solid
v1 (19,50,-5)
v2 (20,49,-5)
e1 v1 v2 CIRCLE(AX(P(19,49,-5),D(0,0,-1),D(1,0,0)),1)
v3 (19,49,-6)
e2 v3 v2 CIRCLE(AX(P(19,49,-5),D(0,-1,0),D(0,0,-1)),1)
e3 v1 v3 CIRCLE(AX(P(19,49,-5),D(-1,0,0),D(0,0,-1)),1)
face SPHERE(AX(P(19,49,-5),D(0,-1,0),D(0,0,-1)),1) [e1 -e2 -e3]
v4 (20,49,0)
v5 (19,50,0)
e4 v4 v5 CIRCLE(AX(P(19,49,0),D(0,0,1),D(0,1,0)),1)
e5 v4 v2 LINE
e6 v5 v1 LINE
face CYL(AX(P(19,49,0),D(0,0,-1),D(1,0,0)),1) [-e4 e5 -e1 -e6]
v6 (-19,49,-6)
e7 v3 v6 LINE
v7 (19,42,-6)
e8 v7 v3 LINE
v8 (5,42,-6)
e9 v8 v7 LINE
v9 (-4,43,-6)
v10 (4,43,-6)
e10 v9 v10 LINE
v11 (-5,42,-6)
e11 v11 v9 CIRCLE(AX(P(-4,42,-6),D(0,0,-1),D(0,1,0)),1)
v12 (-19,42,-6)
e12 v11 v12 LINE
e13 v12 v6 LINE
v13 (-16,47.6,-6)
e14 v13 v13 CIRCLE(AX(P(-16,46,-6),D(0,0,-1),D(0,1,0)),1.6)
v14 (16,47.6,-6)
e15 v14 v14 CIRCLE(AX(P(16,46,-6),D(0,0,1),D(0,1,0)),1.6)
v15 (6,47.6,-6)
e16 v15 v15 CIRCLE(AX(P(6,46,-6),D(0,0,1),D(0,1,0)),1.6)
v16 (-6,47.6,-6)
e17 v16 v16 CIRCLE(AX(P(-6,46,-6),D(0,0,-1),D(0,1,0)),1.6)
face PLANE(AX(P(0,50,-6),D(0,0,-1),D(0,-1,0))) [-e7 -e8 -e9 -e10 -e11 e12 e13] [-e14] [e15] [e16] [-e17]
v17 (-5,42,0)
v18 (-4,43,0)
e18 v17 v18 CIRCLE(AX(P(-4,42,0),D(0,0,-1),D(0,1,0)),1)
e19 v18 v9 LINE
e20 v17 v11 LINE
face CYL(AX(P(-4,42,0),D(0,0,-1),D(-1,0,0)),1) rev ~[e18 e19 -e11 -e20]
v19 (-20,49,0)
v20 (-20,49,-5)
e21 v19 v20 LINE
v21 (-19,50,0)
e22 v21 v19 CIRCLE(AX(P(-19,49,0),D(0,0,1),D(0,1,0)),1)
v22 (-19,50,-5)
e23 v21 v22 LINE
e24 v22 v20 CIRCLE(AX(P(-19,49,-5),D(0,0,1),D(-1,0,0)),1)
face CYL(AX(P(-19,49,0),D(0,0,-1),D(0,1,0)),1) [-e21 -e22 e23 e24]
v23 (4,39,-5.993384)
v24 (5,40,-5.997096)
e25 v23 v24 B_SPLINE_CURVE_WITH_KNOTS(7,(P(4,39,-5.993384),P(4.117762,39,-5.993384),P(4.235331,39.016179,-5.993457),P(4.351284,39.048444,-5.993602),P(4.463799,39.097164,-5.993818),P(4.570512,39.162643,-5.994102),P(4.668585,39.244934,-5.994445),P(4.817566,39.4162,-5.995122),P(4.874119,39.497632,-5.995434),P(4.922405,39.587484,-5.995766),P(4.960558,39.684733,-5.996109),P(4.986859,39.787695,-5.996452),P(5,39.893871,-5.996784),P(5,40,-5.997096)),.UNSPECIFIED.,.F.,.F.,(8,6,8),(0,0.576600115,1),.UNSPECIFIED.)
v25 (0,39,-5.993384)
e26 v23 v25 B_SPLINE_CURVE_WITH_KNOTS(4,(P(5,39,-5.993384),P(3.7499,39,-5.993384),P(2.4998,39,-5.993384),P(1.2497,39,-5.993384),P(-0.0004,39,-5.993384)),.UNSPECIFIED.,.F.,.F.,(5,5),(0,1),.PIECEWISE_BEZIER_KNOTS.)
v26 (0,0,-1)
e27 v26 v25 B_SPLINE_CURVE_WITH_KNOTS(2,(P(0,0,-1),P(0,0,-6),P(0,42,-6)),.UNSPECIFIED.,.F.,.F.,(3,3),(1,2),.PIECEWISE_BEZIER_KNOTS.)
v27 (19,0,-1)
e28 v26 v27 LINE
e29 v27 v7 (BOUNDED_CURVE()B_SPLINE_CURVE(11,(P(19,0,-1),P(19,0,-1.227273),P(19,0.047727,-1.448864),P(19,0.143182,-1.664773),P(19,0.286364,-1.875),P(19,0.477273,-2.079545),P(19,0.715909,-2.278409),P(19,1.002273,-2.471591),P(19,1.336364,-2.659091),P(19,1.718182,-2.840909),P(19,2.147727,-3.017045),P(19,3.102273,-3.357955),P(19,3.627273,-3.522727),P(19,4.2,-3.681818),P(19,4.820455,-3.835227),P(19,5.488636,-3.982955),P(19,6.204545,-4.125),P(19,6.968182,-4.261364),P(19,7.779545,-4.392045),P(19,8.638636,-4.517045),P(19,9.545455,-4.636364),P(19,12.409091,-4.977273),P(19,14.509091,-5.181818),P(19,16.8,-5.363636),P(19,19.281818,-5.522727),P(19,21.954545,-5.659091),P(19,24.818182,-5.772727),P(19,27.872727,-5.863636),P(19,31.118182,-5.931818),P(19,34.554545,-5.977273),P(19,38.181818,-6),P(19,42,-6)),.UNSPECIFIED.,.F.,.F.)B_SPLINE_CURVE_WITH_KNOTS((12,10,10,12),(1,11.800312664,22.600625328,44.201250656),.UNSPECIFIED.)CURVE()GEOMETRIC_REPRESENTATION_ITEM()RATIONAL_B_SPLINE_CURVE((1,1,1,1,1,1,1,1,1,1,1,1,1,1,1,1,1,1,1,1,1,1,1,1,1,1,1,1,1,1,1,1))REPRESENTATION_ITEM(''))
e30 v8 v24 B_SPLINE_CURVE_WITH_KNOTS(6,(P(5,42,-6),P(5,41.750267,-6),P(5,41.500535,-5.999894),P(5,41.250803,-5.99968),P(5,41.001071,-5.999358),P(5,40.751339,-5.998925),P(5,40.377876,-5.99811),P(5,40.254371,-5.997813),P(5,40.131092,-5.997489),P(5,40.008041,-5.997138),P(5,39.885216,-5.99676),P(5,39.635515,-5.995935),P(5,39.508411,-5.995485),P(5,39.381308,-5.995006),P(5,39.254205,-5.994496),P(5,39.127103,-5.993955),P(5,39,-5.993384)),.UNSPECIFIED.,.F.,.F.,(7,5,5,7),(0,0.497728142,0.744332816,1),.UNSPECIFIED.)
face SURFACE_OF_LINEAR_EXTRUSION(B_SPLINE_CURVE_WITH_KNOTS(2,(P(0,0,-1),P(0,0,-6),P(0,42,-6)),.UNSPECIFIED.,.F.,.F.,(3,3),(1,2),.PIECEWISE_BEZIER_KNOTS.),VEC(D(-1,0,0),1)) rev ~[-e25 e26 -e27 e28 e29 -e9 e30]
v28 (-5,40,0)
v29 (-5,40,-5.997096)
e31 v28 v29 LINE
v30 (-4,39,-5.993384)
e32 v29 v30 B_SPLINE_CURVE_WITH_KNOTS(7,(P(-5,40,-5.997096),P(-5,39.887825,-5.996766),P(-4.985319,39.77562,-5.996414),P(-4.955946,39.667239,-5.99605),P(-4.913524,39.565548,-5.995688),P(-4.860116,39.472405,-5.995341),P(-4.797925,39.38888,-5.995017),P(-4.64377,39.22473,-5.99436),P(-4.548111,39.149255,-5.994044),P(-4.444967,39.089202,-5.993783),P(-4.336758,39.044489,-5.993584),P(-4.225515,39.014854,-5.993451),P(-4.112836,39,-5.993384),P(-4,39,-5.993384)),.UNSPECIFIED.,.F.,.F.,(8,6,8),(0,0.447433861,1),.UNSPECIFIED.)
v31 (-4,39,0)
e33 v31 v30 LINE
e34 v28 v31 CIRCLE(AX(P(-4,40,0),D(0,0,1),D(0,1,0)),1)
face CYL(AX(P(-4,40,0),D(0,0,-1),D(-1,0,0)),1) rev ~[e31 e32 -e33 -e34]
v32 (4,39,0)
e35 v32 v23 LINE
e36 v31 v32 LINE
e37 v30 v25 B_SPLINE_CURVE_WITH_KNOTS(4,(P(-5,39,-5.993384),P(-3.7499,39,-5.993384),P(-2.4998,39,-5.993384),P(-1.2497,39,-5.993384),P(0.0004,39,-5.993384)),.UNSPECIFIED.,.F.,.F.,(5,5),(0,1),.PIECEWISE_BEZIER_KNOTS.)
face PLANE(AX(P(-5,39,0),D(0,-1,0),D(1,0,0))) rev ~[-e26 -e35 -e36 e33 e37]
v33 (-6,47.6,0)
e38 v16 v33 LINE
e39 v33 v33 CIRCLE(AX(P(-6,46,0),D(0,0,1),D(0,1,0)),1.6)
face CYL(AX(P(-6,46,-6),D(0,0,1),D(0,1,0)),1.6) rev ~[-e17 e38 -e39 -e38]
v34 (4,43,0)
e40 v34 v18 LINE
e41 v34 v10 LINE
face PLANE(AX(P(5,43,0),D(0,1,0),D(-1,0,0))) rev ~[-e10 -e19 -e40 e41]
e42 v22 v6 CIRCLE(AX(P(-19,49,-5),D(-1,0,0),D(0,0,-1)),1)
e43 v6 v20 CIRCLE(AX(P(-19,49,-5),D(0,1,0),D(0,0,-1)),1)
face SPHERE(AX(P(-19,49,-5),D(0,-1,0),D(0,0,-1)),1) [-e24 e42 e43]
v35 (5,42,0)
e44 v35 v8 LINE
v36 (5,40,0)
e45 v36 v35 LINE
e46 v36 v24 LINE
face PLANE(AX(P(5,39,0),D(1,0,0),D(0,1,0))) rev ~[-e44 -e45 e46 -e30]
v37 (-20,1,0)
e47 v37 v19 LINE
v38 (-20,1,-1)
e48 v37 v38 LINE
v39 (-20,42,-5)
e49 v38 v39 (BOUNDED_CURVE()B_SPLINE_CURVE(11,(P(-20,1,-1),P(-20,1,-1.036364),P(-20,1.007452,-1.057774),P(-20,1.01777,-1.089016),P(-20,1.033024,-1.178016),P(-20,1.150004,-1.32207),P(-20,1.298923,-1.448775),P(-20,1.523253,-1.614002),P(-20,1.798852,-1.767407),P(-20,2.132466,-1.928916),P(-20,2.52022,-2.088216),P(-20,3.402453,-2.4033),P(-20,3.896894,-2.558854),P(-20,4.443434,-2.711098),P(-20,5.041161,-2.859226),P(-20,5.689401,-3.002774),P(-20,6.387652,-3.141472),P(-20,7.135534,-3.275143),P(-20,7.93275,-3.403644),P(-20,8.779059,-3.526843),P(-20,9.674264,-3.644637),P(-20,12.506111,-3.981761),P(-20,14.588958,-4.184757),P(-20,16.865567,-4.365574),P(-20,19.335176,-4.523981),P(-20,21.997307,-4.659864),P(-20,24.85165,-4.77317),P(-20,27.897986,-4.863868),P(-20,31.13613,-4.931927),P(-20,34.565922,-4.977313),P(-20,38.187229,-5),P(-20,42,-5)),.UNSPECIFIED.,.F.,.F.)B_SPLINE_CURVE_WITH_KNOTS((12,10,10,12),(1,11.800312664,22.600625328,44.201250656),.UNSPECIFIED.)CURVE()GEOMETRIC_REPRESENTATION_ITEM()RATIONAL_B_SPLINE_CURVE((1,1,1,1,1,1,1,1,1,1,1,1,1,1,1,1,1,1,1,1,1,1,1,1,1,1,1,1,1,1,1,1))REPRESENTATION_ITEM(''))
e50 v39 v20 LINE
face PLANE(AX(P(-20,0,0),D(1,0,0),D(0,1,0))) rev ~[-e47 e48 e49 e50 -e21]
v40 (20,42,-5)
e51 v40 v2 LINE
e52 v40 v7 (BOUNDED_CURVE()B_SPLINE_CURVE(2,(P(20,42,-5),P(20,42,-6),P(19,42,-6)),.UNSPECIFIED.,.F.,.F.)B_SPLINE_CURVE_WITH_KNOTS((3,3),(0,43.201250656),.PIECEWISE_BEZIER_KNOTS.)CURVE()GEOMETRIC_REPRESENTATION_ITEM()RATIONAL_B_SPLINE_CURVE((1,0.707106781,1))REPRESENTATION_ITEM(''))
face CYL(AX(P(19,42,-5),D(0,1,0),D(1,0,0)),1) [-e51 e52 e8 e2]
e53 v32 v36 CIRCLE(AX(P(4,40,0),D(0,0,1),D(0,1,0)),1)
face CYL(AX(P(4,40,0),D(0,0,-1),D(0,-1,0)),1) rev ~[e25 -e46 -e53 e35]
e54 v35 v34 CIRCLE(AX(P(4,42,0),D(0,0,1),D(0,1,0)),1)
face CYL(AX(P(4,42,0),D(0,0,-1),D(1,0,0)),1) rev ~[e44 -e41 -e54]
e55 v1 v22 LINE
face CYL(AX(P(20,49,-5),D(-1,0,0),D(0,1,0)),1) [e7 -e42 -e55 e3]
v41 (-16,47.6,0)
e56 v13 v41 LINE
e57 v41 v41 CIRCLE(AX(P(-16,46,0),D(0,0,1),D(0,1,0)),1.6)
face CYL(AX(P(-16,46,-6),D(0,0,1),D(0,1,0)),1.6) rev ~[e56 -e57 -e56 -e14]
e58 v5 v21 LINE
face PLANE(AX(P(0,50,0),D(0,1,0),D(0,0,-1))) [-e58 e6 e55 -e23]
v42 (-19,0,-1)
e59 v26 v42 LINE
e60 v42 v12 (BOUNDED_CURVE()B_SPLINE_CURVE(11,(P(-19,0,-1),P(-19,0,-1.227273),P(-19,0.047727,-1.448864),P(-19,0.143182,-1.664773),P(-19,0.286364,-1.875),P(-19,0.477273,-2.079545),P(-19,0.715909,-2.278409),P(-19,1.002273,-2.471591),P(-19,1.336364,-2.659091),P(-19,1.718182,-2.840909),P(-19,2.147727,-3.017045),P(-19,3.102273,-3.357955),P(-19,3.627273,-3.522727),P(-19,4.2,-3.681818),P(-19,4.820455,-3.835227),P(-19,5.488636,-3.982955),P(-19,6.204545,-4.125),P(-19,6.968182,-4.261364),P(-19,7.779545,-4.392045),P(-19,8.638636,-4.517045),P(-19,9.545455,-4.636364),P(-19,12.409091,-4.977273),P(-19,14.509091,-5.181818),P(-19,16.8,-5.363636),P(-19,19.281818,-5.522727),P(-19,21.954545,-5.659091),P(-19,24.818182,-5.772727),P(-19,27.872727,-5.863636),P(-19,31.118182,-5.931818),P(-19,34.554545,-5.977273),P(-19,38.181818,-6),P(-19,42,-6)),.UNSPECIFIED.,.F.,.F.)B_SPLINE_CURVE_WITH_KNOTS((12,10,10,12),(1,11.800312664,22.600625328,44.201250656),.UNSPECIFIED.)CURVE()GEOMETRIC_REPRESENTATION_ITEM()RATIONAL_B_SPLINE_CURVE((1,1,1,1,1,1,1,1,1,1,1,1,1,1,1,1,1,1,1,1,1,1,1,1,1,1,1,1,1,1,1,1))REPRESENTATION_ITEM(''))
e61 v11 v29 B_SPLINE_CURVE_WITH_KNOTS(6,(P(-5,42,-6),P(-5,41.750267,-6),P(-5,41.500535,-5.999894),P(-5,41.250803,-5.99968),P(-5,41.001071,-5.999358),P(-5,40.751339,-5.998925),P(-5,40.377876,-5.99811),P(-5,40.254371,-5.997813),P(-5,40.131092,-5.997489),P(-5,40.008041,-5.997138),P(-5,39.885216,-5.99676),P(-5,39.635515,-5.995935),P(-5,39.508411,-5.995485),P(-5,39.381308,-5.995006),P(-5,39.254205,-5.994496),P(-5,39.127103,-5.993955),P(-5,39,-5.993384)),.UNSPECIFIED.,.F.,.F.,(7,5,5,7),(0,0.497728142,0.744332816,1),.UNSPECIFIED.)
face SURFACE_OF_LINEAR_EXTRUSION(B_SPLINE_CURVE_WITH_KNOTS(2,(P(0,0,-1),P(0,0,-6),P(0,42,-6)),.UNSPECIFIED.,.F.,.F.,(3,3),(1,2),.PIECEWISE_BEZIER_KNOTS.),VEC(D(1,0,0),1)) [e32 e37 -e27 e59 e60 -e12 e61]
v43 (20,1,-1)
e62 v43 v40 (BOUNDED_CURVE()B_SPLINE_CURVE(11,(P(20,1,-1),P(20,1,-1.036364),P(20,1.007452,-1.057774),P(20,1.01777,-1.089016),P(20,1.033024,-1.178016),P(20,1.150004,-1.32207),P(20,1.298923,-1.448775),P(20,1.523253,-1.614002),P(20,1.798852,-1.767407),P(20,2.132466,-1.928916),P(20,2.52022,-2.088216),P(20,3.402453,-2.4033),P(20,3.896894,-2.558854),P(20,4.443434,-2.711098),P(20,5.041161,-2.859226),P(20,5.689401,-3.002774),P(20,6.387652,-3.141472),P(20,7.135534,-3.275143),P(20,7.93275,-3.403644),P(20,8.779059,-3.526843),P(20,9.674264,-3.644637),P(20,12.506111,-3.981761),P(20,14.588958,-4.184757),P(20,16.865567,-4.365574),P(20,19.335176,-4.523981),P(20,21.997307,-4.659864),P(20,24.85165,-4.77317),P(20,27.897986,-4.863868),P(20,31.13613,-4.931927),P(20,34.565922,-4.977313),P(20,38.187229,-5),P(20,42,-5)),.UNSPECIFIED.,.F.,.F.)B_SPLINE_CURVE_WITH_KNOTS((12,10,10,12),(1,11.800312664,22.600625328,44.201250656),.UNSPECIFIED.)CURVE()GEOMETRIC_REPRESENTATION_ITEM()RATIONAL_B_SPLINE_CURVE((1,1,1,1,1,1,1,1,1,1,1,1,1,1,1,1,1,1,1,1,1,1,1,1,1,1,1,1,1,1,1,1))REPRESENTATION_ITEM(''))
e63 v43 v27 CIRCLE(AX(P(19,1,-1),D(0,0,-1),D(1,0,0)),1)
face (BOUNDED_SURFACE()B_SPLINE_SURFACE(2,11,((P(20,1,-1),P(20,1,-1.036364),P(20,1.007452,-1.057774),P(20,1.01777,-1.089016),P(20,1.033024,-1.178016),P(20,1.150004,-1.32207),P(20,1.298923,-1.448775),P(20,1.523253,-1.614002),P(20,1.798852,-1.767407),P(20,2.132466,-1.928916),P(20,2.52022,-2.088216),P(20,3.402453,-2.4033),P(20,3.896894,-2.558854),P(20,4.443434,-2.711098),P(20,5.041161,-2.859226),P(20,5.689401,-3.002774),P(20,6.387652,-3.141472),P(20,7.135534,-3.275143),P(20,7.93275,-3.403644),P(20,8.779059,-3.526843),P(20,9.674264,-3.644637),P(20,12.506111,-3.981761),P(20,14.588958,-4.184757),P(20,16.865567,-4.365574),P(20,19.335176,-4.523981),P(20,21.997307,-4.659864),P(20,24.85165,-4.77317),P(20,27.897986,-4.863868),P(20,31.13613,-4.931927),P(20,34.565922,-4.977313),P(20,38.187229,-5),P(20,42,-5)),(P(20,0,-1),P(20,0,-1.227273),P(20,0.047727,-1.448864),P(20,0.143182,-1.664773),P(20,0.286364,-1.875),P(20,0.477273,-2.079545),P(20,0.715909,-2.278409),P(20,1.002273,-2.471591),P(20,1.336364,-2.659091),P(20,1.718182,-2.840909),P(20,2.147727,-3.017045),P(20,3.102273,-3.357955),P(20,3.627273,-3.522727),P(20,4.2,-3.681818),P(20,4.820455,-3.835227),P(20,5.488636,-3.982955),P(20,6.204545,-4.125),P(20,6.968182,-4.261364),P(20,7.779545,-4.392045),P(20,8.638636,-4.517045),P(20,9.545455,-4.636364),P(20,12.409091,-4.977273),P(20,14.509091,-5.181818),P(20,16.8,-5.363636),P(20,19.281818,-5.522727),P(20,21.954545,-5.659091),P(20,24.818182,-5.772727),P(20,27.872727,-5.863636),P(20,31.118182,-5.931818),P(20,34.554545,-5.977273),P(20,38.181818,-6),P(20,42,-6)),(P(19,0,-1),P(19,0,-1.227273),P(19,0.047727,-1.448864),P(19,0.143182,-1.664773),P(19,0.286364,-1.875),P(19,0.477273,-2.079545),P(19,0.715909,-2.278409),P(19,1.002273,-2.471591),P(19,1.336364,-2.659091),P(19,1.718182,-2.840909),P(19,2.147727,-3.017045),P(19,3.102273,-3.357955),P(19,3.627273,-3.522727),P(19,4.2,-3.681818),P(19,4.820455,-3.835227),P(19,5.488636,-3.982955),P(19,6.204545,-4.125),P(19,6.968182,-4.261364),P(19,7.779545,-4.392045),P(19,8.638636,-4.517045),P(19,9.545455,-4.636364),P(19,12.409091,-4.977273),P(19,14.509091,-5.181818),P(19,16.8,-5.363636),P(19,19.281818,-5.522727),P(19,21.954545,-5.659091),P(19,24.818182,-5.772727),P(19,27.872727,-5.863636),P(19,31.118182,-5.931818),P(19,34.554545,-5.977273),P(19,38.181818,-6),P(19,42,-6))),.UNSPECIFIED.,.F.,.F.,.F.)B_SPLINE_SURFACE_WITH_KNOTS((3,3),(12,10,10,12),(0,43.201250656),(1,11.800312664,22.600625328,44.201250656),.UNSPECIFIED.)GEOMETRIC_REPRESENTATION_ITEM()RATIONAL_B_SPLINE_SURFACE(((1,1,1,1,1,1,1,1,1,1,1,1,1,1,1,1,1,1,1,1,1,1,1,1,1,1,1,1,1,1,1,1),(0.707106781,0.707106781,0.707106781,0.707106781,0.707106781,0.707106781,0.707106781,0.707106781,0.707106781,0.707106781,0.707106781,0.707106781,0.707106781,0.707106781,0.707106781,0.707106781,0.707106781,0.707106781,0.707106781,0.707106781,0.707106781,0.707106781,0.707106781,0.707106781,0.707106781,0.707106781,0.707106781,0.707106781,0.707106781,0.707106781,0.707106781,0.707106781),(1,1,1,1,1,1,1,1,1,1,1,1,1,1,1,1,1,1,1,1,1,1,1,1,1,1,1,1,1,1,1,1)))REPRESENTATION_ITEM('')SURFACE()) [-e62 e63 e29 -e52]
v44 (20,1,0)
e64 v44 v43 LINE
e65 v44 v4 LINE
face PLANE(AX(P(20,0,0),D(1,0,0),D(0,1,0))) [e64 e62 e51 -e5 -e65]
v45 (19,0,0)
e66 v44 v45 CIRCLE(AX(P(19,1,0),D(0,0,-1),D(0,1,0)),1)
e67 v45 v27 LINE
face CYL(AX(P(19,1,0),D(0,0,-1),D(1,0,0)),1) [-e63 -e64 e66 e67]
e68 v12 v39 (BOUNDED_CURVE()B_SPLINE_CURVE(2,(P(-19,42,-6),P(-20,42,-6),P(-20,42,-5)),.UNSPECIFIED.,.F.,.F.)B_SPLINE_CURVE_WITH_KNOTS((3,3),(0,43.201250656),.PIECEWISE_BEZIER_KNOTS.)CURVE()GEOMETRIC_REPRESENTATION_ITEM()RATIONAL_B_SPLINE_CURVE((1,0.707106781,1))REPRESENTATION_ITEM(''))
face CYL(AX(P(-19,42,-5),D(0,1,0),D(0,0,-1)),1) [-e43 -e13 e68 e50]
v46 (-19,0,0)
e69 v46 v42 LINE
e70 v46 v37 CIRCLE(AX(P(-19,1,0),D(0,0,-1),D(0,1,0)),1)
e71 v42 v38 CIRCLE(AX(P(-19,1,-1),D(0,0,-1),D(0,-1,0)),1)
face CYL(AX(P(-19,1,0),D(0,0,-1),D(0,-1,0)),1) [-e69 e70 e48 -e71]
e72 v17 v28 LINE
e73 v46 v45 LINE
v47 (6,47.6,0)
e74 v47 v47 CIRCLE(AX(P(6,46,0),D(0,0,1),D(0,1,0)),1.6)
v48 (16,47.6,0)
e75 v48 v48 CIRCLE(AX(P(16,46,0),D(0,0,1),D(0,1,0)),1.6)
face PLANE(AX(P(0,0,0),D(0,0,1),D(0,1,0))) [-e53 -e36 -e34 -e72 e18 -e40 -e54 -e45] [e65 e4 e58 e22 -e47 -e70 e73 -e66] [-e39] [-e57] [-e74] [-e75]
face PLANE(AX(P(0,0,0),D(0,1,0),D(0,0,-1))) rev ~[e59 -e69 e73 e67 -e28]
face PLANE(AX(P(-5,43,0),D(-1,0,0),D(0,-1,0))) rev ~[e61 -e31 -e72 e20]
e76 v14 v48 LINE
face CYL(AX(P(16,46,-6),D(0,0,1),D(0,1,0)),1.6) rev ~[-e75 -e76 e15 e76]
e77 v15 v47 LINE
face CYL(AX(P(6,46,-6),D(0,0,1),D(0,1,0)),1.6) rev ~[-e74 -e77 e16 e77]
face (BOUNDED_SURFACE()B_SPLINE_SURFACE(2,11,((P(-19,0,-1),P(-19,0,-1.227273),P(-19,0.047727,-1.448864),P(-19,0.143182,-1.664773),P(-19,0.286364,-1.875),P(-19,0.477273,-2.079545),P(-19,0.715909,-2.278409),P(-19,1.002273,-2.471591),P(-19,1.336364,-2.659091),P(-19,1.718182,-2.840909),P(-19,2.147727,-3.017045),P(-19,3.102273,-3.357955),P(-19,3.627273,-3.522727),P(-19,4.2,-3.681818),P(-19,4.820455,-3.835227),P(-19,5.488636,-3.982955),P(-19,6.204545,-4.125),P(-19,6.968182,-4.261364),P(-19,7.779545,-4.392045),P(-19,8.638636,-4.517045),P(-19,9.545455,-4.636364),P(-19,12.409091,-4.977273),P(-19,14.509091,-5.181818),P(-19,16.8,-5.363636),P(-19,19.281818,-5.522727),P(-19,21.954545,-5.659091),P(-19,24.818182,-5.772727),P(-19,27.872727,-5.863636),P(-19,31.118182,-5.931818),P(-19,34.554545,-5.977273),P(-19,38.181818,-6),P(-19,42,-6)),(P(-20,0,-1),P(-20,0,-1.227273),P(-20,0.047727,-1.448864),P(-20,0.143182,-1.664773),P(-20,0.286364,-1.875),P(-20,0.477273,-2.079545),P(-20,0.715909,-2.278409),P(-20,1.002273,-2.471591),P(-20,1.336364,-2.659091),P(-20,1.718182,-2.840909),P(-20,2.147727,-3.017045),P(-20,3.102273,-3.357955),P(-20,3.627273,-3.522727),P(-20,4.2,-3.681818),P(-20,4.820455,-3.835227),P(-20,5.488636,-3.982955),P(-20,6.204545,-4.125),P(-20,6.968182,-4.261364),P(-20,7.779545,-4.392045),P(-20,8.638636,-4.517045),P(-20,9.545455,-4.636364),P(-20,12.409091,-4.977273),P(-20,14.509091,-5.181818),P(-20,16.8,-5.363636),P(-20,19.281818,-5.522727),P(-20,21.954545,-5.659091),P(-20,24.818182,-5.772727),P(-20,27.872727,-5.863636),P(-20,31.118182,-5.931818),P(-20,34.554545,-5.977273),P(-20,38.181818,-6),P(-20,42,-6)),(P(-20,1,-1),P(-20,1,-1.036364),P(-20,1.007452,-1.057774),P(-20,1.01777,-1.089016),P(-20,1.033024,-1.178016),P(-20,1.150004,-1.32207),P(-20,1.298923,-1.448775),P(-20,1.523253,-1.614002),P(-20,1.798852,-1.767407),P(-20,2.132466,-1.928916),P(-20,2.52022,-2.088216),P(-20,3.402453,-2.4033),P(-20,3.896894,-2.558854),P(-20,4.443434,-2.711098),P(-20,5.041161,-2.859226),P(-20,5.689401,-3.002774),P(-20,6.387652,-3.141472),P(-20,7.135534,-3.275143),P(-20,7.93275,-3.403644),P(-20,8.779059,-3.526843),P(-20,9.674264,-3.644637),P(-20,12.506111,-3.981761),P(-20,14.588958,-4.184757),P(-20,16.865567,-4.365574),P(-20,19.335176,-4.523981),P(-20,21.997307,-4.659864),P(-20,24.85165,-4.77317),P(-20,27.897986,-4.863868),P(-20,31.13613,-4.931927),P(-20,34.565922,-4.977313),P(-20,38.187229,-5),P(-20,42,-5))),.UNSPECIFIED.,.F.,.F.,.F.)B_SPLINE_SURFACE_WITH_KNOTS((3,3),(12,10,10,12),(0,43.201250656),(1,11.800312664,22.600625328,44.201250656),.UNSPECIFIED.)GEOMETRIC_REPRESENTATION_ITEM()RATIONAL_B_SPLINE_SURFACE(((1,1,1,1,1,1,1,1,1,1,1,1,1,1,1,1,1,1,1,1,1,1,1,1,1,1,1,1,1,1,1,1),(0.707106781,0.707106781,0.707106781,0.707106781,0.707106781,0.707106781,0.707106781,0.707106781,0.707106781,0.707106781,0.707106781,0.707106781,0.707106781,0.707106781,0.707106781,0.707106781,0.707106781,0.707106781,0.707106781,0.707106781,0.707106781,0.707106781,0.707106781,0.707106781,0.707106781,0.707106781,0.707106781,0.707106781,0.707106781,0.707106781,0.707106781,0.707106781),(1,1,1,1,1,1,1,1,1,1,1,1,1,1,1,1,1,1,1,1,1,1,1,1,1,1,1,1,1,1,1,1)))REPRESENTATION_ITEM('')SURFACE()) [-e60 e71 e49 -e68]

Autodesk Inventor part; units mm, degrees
ref_plane "YZ Plane" through (0, 0, 0) normal (1, 0, 0) x (0, 1, 0)
ref_plane "XZ Plane" through (0, 0, 0) normal (0, 1, 0) x (-1, 0, 0)
ref_plane "XY Plane" through (0, 0, 0) normal (0, 0, 1) x (1, 0, 0)
sketch "スケッチ3" plane through (0, 0, 0) normal (1, 0, 0) x (0, 1, 0)
  line L0 (0, 0) -> (50, 0)
  line L1 (50, 0) -> (50, -6)
  line L2 (50, -6) -> (42, -6)
  line L3 (0, 0) -> (0, -1)
  line L4 (0, -1) -> (0, -6) construction
  line L5 (0, -6) -> (42, -6) construction
  spline S0 degree 2 poles (0, -1) (0, -6) (42, -6) knots 1 1 1 2 2 2
  dimension "d14" = 6
  dimension "d15" = 1
  dimension "d16" = 8
  dimension "d17" = 50
extrude "押し出し2" add sketch "スケッチ3" along normal mid plane 40
sketch "スケッチ4" plane through (20, 50, -6) normal (0, 0, -1) x (-1, 0, 0)
  line L0 (0, -8) -> (0, 0) projected
  line L1 (40, 0) -> (0, 0) projected
  point P0 (20, -50)
  point P1 (14, -4)
  point P2 (14, -4)
  point P3 (4, -4)
  dimension "d20" = 4
  dimension "d21" = 4
  dimension "d22" = 10
hole "穴2" at (6, 46, -6) at (16, 46, -6) direction (0, 0, 1) diameter 3.2 end through all clearance for "Flat Head Machine Screw" size "M3" standard "Ansi Metric M Profile"
fillet "フィレット1" radius 1 9 edges at (20, 10.5, -4.75) (20, 46, -6) (20, 0, -0.5) (-20, 0, -0.5) (-20, 46, -6) (-20, 10.5, -4.75) (0, 50, -6) (-20, 50, -3) (20, 50, -3)
mirror "ミラー1" about plane through (0, 0, 0) normal (1, 0, 0) of "穴2"
sketch "スケッチ5" plane through (-19, 50, 0) normal (0, 0, 1) x (1, 0, 0)
  line L0 (0, -11) -> (38, -11)
  line L1 (38, -11) -> (38, -49)
  line L2 (38, -49) -> (0, -49)
  line L3 (0, -49) -> (0, -11)
  line L4 (0, -11) -> (38, -49) construction
  line L5 (38, -11) -> (0, -49) construction
  line L6 (-1, -49) -> (-1, -1) projected
  line L7 (0, -50) -> (38, -50) projected
  line L8 (14, -11) -> (24, -11)
  line L9 (24, -11) -> (24, -7)
  line L10 (24, -7) -> (14, -7)
  line L11 (14, -7) -> (14, -11)
  line L12 (14, -11) -> (24, -7) construction
  line L13 (24, -11) -> (14, -7) construction
  line L14 (0, 0) -> (38, 0) projected
  point P0 (19, -50)
  point P1 (19, -30)
  point P2 (19, -9)
  point P3 (19, -9)
  point P4 (19, -30)
  point P5 (24, -11)
  point P6 (24, 0)
  point P7 (19, -9)
  dimension "d31" = 38
  dimension "d32" = 38
  dimension "d33" = 1
  dimension "d34" = 1
  dimension "d35" = 10
  dimension "d36" = 4
extrude "押し出し3" cut sketch "スケッチ5" against normal blind 40 contours L11 L10 L9 L0
fillet "フィレット2" radius 1 4 edges at (-5, 39, -2.9967) (-5, 43, -3) (5, 43, -3) (5, 39, -2.9967)
properties part number "base22" material "ABS プラスチック"
